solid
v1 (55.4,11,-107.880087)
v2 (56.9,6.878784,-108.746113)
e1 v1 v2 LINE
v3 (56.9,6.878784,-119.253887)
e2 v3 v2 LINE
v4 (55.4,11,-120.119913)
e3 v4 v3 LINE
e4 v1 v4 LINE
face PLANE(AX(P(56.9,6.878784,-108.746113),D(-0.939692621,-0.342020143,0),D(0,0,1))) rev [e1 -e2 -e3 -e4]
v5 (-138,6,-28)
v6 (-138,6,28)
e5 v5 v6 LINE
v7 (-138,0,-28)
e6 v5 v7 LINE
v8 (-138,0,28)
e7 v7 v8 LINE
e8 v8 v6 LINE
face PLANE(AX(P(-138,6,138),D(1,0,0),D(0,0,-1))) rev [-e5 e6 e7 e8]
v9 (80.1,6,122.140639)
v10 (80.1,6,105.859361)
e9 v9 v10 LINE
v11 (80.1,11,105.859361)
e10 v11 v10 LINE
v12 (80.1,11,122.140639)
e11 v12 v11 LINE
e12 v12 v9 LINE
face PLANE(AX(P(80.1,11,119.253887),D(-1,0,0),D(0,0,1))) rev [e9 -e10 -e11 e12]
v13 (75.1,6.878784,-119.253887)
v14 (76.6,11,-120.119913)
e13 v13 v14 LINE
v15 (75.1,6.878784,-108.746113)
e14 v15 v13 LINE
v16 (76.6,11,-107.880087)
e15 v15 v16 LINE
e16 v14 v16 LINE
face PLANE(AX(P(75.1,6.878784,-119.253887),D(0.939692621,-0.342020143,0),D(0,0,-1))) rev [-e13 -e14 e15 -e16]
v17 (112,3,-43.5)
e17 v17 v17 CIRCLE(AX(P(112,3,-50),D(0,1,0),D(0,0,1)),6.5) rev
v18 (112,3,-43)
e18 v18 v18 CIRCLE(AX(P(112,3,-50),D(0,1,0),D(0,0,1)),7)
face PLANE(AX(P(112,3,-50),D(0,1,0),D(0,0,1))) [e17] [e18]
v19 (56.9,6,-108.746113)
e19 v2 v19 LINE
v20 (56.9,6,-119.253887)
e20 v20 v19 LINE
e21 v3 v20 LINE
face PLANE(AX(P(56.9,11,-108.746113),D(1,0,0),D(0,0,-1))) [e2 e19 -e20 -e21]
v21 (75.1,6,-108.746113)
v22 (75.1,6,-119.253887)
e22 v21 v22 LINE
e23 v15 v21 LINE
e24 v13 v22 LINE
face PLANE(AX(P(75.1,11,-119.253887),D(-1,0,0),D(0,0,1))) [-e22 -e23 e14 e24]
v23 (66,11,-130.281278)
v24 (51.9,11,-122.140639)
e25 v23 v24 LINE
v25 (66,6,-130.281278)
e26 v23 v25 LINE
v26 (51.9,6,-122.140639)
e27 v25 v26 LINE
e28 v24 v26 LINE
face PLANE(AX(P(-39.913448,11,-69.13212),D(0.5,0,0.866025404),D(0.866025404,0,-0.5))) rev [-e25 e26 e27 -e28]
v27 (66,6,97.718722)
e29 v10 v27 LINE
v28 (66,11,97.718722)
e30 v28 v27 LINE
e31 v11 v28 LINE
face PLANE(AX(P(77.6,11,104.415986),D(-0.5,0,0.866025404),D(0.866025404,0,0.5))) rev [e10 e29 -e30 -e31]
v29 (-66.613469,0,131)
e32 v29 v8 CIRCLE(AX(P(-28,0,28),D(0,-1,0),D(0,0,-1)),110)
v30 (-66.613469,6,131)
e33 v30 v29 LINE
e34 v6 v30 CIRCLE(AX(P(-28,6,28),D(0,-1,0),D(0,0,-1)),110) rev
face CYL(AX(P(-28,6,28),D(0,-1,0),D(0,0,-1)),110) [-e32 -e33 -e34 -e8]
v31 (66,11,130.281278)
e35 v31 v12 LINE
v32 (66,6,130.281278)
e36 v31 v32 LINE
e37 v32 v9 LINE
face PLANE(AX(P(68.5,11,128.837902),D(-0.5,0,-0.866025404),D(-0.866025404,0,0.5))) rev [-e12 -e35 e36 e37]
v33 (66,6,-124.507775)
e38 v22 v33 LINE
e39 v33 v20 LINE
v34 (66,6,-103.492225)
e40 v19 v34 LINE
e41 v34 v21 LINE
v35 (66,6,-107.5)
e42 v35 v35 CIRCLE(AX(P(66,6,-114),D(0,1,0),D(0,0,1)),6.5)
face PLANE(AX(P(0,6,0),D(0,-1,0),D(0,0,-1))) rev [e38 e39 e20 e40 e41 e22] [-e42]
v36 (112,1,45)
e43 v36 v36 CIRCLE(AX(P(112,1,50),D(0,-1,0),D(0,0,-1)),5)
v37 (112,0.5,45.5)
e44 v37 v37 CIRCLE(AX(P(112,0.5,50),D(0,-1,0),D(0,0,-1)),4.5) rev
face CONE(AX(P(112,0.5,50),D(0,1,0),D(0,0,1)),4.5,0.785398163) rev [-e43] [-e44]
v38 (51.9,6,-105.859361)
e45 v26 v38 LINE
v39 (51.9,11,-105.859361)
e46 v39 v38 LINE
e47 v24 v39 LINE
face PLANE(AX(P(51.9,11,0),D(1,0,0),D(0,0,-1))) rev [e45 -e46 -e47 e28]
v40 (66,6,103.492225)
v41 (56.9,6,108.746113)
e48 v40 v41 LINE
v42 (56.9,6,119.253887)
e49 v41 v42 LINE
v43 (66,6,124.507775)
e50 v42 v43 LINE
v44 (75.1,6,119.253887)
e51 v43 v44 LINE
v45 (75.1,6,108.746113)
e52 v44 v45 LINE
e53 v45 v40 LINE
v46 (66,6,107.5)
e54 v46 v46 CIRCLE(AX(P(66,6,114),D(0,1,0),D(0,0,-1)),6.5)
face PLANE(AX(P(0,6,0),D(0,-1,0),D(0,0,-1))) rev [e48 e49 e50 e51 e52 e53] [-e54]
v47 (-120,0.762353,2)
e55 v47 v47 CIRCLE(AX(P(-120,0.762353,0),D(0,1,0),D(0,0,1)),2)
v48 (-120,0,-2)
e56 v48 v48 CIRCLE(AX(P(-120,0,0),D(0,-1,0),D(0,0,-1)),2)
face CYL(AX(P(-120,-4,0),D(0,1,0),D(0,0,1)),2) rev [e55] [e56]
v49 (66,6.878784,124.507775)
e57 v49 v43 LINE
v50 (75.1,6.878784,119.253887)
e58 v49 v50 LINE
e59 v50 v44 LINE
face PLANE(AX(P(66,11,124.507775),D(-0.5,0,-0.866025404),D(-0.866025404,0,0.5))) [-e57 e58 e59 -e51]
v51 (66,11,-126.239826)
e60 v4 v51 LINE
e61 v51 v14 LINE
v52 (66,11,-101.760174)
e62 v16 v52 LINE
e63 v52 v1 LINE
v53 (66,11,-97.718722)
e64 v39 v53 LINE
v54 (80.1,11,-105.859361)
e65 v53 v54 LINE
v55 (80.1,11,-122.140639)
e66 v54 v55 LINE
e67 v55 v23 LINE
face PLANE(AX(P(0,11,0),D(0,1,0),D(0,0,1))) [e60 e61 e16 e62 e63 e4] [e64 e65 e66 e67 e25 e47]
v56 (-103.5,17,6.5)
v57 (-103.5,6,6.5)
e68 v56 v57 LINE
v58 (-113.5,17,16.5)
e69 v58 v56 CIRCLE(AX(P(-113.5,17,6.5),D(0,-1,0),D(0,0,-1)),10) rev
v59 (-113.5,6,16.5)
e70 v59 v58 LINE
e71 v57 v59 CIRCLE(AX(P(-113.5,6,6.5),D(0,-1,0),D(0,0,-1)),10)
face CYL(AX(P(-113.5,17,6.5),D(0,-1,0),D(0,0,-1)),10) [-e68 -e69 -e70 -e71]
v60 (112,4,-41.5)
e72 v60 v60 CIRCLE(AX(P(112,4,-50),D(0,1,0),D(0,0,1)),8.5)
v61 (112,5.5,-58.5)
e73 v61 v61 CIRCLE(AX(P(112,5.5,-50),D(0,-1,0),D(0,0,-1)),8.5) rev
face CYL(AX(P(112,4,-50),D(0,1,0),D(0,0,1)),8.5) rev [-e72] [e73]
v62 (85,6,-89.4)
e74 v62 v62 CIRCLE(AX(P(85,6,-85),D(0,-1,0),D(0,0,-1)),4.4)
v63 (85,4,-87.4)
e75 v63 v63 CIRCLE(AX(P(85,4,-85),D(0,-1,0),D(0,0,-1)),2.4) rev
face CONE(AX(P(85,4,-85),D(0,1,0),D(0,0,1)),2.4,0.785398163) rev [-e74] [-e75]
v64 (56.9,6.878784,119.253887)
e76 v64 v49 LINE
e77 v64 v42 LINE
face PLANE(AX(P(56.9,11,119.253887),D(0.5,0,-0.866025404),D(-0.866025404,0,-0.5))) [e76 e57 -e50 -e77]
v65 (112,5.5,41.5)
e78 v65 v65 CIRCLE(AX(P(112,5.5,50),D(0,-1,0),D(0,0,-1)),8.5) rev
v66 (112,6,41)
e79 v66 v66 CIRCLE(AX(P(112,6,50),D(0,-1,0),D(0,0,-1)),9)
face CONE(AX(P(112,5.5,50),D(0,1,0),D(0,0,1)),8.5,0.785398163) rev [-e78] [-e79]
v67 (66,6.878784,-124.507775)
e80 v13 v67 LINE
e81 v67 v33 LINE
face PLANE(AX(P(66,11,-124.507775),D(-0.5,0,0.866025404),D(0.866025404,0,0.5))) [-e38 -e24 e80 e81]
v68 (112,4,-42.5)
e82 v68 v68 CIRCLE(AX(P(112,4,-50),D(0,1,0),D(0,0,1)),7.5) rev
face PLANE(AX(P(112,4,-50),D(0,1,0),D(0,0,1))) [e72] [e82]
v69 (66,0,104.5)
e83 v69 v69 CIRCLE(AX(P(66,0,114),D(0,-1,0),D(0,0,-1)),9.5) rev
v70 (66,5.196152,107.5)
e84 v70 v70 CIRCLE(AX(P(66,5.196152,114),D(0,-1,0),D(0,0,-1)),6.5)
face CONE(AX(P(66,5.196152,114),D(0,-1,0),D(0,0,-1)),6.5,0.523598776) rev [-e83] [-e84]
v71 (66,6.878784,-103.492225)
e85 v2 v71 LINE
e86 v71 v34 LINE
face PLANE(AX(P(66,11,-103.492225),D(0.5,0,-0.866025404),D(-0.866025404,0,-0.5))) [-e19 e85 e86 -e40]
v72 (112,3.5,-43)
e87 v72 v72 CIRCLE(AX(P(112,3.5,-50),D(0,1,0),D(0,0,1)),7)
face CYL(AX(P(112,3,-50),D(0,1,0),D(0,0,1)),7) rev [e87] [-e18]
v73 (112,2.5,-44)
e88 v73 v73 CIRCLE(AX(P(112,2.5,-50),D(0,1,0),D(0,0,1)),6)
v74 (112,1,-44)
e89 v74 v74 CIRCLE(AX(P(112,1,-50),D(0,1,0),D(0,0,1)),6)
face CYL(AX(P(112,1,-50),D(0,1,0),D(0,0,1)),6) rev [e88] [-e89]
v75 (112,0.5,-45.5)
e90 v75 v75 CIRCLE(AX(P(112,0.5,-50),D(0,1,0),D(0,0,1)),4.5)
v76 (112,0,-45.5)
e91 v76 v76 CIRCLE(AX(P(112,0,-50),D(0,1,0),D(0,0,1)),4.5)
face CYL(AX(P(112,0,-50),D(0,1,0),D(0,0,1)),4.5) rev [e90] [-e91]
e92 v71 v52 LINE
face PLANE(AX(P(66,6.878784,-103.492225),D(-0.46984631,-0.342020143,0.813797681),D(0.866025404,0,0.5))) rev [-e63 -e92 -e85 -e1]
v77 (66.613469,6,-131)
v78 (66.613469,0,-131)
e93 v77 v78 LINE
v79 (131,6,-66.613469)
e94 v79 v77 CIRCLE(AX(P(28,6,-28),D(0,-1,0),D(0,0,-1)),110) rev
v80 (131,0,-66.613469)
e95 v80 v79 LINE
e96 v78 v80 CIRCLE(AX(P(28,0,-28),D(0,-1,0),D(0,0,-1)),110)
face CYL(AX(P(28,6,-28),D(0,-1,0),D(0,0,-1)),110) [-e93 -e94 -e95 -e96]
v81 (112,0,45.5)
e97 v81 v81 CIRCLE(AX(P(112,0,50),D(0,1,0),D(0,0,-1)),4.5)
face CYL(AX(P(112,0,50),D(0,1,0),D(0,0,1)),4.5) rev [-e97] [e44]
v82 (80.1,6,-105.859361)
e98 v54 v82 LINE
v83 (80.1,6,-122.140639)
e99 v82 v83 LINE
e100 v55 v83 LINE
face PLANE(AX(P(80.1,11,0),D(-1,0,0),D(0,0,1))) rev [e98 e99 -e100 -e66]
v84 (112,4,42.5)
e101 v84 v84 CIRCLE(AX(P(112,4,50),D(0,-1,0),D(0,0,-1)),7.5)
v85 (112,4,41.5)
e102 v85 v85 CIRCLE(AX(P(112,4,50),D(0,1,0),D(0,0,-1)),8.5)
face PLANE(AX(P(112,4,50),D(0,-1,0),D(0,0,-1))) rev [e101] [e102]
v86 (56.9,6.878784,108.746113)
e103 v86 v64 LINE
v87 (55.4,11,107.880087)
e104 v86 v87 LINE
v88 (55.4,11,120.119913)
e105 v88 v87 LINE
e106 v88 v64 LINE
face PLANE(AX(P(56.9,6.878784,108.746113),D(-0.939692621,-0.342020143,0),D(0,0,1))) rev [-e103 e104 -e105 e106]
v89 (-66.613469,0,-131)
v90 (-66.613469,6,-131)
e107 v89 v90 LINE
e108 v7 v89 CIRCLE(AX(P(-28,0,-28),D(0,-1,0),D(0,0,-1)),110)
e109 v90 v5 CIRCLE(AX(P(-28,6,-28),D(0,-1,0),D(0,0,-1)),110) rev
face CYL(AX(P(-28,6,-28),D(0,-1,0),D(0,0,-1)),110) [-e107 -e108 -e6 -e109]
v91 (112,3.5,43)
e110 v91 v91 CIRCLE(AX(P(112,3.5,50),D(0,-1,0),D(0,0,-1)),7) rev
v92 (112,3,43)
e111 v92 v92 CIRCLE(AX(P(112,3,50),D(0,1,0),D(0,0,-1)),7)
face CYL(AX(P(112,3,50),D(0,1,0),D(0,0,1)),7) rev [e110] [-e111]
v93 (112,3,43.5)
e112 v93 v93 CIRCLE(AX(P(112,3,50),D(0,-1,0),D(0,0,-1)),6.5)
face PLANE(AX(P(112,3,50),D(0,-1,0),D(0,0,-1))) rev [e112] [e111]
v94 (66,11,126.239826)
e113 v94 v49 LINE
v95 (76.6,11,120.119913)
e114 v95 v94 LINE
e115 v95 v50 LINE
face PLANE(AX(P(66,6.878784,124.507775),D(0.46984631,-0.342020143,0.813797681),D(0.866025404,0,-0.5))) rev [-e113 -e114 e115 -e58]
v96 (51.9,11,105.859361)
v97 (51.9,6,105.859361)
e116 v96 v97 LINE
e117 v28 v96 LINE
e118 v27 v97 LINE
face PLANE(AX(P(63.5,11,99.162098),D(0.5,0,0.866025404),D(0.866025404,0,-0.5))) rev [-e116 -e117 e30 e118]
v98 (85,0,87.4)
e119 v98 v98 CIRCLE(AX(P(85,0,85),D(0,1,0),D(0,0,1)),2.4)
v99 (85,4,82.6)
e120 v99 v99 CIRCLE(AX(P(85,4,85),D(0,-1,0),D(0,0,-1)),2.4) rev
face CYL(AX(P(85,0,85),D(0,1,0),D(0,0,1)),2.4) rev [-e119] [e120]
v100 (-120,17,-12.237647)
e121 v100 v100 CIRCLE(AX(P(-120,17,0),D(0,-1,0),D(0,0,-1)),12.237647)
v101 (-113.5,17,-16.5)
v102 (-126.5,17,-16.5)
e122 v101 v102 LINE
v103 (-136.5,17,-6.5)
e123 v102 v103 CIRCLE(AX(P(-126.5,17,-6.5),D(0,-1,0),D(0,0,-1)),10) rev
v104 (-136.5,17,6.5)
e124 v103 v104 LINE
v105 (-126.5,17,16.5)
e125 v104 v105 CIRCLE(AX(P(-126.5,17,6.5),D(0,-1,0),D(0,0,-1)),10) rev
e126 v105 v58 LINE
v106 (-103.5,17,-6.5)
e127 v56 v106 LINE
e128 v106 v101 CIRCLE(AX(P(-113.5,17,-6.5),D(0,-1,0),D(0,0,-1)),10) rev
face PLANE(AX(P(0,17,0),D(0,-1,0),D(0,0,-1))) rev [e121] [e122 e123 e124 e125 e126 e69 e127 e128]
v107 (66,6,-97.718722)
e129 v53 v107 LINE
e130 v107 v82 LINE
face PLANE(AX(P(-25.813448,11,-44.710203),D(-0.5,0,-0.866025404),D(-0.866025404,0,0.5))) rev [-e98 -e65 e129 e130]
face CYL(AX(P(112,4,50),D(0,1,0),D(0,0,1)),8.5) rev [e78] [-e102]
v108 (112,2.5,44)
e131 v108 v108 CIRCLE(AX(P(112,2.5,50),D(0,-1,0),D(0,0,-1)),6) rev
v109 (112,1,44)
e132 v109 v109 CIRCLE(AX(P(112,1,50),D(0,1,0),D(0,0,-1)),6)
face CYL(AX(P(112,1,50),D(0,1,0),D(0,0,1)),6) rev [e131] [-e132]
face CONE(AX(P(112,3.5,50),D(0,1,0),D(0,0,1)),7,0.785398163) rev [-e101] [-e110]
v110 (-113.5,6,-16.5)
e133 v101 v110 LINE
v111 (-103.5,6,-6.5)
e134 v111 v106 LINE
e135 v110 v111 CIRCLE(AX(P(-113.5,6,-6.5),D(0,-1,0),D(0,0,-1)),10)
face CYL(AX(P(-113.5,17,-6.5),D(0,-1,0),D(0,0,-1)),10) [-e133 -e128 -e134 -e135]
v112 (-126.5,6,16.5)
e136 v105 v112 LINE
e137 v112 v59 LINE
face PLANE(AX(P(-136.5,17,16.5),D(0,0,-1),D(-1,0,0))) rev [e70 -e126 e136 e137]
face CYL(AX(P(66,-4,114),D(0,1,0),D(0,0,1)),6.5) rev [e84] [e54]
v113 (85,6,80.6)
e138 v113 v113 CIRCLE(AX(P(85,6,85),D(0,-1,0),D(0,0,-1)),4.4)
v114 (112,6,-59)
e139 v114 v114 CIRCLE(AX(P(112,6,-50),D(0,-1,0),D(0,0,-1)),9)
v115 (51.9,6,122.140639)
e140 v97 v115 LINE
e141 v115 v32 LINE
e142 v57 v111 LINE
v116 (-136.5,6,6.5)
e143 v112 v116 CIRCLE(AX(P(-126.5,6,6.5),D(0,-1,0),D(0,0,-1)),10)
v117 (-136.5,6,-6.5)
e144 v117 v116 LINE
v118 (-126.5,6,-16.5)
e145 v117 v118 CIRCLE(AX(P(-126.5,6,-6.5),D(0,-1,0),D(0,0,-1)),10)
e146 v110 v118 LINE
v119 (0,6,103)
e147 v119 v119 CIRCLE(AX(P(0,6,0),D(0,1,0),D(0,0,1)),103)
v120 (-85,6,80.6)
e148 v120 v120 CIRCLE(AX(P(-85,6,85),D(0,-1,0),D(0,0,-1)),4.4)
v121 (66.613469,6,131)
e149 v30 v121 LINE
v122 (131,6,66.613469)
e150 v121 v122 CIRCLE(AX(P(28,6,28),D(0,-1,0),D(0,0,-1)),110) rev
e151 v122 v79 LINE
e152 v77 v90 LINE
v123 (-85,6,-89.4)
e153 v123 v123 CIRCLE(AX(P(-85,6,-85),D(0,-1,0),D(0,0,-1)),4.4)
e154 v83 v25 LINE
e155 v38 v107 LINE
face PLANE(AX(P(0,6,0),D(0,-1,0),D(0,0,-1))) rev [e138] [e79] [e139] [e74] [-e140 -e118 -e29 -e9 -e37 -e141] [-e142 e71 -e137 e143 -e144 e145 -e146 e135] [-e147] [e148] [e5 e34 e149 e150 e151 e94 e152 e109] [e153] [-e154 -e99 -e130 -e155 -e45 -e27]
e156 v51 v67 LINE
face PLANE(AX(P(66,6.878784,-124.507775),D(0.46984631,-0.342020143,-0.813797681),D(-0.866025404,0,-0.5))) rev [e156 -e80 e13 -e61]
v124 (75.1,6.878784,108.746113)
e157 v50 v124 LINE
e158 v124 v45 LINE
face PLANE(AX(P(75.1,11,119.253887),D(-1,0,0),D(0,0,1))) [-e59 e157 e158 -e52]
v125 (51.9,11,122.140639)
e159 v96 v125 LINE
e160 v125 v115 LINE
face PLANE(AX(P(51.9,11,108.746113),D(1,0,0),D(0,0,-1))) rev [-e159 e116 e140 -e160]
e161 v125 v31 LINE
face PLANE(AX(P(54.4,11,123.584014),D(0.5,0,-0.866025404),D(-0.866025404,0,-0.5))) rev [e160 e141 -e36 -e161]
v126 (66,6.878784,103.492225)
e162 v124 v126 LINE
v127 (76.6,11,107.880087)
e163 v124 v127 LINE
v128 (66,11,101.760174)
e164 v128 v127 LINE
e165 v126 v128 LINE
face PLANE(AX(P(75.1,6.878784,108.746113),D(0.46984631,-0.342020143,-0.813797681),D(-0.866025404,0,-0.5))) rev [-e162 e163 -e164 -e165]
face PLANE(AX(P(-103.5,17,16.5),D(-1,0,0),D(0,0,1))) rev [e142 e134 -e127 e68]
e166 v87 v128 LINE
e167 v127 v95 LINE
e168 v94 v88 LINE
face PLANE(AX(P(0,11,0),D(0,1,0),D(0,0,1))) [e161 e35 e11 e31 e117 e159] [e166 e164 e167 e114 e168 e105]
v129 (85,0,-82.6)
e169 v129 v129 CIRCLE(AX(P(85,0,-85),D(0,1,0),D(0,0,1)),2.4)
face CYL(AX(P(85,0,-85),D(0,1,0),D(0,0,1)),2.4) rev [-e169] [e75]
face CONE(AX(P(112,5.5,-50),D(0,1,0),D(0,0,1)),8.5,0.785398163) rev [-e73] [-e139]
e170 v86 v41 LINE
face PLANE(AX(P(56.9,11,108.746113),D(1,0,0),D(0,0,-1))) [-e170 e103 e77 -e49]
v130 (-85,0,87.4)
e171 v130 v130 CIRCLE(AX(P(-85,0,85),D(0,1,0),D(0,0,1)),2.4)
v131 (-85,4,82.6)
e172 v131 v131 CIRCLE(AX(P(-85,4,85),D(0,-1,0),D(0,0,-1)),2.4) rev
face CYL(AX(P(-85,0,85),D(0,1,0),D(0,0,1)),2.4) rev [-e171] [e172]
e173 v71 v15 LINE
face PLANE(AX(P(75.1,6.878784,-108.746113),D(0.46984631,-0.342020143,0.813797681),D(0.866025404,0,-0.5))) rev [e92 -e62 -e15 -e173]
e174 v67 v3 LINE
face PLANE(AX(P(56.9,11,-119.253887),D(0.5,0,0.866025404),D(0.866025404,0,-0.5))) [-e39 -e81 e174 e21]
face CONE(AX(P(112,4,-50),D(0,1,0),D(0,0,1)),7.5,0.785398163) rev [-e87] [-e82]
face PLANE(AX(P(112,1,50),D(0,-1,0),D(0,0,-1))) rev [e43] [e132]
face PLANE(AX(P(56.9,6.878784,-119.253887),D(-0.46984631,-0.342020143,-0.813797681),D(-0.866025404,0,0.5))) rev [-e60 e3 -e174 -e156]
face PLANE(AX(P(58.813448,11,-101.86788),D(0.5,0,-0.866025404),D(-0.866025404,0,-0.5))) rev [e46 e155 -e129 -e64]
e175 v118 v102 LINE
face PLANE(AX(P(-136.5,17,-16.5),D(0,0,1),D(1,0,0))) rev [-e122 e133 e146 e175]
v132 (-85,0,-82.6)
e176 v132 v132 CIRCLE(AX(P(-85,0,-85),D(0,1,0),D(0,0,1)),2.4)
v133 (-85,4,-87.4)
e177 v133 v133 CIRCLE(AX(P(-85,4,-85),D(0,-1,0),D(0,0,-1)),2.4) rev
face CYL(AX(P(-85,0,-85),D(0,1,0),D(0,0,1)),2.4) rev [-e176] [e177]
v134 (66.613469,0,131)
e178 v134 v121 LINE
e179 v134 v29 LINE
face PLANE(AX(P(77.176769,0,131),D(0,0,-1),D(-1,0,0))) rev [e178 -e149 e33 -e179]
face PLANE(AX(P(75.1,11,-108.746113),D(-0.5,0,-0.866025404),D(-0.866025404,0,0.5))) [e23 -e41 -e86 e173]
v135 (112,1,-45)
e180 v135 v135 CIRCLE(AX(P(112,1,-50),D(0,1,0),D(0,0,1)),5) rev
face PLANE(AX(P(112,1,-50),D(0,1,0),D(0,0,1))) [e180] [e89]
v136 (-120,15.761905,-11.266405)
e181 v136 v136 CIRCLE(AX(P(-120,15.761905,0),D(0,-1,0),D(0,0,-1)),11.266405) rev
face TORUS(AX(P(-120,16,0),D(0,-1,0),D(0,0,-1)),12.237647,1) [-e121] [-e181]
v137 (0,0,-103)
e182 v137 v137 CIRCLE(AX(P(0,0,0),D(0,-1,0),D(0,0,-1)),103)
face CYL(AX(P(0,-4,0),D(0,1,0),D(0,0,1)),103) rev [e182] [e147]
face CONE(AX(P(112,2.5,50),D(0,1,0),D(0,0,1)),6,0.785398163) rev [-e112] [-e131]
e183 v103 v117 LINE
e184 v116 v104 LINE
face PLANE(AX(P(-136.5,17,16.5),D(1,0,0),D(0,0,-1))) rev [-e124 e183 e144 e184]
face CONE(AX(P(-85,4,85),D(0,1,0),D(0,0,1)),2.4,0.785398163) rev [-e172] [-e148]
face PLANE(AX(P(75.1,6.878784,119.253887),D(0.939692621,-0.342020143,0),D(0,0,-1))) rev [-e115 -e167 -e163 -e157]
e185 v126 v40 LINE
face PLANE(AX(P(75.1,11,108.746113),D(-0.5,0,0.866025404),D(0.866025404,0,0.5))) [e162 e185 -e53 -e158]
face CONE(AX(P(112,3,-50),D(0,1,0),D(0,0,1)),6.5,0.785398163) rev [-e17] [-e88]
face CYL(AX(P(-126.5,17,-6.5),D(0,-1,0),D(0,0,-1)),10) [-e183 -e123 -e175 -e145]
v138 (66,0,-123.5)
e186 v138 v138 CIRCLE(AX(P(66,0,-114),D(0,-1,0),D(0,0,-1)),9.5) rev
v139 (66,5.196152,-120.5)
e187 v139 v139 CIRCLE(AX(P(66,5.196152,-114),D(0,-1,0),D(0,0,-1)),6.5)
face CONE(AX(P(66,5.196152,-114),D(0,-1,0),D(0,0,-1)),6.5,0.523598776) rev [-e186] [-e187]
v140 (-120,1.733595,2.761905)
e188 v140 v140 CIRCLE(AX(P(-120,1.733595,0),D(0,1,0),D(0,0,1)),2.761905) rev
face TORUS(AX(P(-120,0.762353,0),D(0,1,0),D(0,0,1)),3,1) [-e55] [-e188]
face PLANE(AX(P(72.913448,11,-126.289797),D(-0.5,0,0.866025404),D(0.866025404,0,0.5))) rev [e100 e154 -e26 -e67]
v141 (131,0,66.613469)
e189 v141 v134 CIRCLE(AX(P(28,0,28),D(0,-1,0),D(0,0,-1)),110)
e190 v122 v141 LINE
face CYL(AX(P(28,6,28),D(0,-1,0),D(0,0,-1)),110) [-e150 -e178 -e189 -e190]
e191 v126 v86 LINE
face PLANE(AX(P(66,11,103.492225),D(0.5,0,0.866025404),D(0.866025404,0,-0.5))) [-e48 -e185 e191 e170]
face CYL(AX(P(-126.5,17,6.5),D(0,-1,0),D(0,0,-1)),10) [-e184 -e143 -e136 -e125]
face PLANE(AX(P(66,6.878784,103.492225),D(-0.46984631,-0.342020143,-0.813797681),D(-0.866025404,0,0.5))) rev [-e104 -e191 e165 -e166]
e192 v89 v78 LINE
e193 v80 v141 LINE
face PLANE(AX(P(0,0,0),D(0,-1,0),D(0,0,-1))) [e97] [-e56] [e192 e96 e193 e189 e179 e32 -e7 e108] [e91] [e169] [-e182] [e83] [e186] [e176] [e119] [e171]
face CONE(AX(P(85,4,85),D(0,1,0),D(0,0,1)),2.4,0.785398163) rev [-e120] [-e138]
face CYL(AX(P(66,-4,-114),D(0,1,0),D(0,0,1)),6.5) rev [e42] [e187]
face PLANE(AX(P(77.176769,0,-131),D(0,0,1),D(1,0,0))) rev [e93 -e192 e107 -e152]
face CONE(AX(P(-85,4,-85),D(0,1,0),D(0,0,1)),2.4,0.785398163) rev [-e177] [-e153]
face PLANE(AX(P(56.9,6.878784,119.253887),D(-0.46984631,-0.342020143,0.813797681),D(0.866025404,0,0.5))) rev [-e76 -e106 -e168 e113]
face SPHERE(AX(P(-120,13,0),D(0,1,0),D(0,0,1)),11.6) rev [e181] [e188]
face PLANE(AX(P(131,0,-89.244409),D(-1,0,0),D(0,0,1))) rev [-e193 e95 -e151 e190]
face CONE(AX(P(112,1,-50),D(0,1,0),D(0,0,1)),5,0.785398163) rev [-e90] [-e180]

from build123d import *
from OCP.BRepFilletAPI import BRepFilletAPI_MakeChamfer

# Parameters (mm, degrees)
SKETCH_1_W           = 276
SKETCH_1_H           = 276
EXTRUDE_1_DEPTH      = 6
SKETCH_4_R           = 6.5
SKETCH_4_R_2         = 2
CUT_EXTRUDE_1_DEPTH  = 10
SKETCH_5_R           = 2.4
CUT_EXTRUDE_2_DEPTH  = 196.253681143
FILLET_1_R           = 110
EXTRUDE_1_2_DEPTH    = 5
CHAMFER_2_SIZE       = 1.5
CHAMFER_2_SIZE2      = 4.121216129
SKETCH_9_W           = 33
SKETCH_9_H           = 33
EXTRUDE_2_DEPTH      = 11
FILLET_2_R           = 1
FILLET_3_R           = 10
CHAMFER_5_SIZE       = 3
CHAMFER_5_SIZE2      = 5.196152423
SKETCH_6_R           = 103
CUT_EXTRUDE_3_DEPTH  = 10
CHAMFER_6_SIZE       = 2
SKETCH_13_R          = 4.5
CUT_EXTRUDE_6_DEPTH  = 196.47122551
SKETCH_14_R          = 6
CUT_EXTRUDE_7_DEPTH  = 5
SKETCH_15_R          = 7
CUT_EXTRUDE_8_DEPTH  = 3
SKETCH_16_R          = 8.5
CUT_EXTRUDE_9_DEPTH  = 2
CHAMFER_7_SIZE       = 0.5
SKETCH_18_W          = 167.450202049
SKETCH_18_H          = 12.846548741
SKETCH_18_W_2        = 47.896370642
SKETCH_18_H_2        = 198.133814491
CUT_EXTRUDE_10_DEPTH = 196.900484949


# Read off the part's stored shape, not the designer's step: Вытянуть-Тонкостенный1
with BuildPart() as part:
    # Эскиз1 → Extrude 1 (new body)
    with BuildSketch(Plane(origin=(0, 0, 0), x_dir=(1, 0, 0), z_dir=(0, 1, 0))):
        Rectangle(SKETCH_1_W, SKETCH_1_H)
    extrude(amount=EXTRUDE_1_DEPTH)

    # Эскиз4 → Cut-Extrude 1 (cut)
    with BuildSketch(Plane(origin=(0, 6, 0), x_dir=(1, 0, 0), z_dir=(0, 1, 0))):
        with Locations(Location((66, 114, 0), (0, 0, 270))):
            Circle(SKETCH_4_R)
        with Locations(Location((-120, 0, 0), (0, 0, 270))):
            Circle(SKETCH_4_R_2)
        with Locations(Location((66, -114, 0), (0, 0, 90))):
            Circle(SKETCH_4_R)
    extrude(amount=-CUT_EXTRUDE_1_DEPTH, mode=Mode.SUBTRACT)

    # Эскиз5 → Вырез-Вытянуть2 (cut, through all)
    with BuildSketch(Plane(origin=(0, 6, 0), x_dir=(1, 0, 0), z_dir=(0, 1, 0))):
        with Locations(Location((-85, 85, 0), (0, 0, 270))):
            Circle(SKETCH_5_R)
        with Locations(Location((85, 85, 0), (0, 0, 270))):
            Circle(SKETCH_5_R)
        with Locations(Location((85, -85, 0), (0, 0, 270))):
            Circle(SKETCH_5_R)
        with Locations(Location((-85, -85, 0), (0, 0, 270))):
            Circle(SKETCH_5_R)
        with Locations(Location((-90, 0, 0), (0, 0, 270))):
            Circle(SKETCH_5_R)
        with Locations(Location((0, 90, 0), (0, 0, 270))):
            Circle(SKETCH_5_R)
        with Locations(Location((0, -90, 0), (0, 0, 90))):
            Circle(SKETCH_5_R)
        with Locations(Location((90, 0, 0), (0, 0, 90))):
            Circle(SKETCH_5_R)
    extrude(amount=-CUT_EXTRUDE_2_DEPTH, mode=Mode.SUBTRACT)

    # Скругление1
    fillet_1_edges = [part.edges().sort_by_distance(p)[0] for p in [
        (138, 3, 138),
        (-138, 3, 138),
        (-138, 3, -138),
        (138, 3, -138),
    ]]
    fillet(fillet_1_edges, radius=FILLET_1_R)

    # Extrude 1 2 outline → Extrude 1 2 (add)
    # profile 1 of 2: a face of its own
    with BuildSketch(Plane(origin=(0, 6, 0), x_dir=(1, 0, 0), z_dir=(0, 1, 0))):
        Polygon((80.1, -105.859361204), (66, -97.718722409), (51.9, -105.859361204), (51.9, -122.140638796), (66, -130.281277591), (80.1, -122.140638796), align=None)
        Polygon((56.9, -108.74611255), (66, -103.492225101), (75.1, -108.74611255), (75.1, -119.25388745), (66, -124.507774899), (56.9, -119.25388745), align=None, mode=Mode.SUBTRACT)
    # profile 2 of 2: a face of its own
    with BuildSketch(Plane(origin=(0, 6, 0), x_dir=(1, 0, 0), z_dir=(0, 1, 0))):
        Polygon((51.9, 122.140638796), (51.9, 105.859361204), (66, 97.718722409), (80.1, 105.859361204), (80.1, 122.140638796), (66, 130.281277591), align=None)
        Polygon((66, 103.492225101), (56.9, 108.74611255), (56.9, 119.25388745), (66, 124.507774899), (75.1, 119.25388745), (75.1, 108.74611255), align=None, mode=Mode.SUBTRACT)
    extrude(amount=EXTRUDE_1_2_DEPTH)

    # Фаска2: one chamfer whose edges measure the first distance from different faces: ONE call of the kernel's chamfer builder (chamfer() names one face for all edges)
    chamfer_2_edges_1 = [part.edges().sort_by_distance(p)[0] for p in [
        (70.55, 11, 106.119168825),
        (61.45, 11, 106.119168825),
        (56.9, 11, 114),
        (61.45, 11, 121.880831175),
        (70.55, 11, 121.880831175),
        (75.1, 11, 114),
    ]]
    chamfer_2_side_1 = [part.faces().sort_by_distance(p)[0] for p in [
        (72.834618942, 11, 102.162092741),
    ]]
    chamfer_2_edges_2 = [part.edges().sort_by_distance(p)[0] for p in [
        (75.1, 11, -114),
        (70.55, 11, -121.880831175),
        (61.45, 11, -121.880831175),
        (56.9, 11, -114),
        (61.45, 11, -106.119168825),
        (70.55, 11, -106.119168825),
    ]]
    chamfer_2_side_2 = [part.faces().sort_by_distance(p)[0] for p in [
        (52.330762115, 11, -114),
    ]]
    chamfer_2 = BRepFilletAPI_MakeChamfer(part.part.solid().wrapped)
    for e in chamfer_2_edges_1:
        chamfer_2.Add(CHAMFER_2_SIZE, CHAMFER_2_SIZE2, e.wrapped, chamfer_2_side_1[0].wrapped)  # the first distance lies on this face
    for e in chamfer_2_edges_2:
        chamfer_2.Add(CHAMFER_2_SIZE, CHAMFER_2_SIZE2, e.wrapped, chamfer_2_side_2[0].wrapped)  # the first distance lies on this face
    add(Compound.cast(chamfer_2.Shape()), mode=Mode.REPLACE)

    # Эскиз9 → Бобышка-Вытянуть2 (add)
    with BuildSketch(Plane(origin=(0, 6, 0), x_dir=(1, 0, 0), z_dir=(0, 1, 0))):
        with Locations((-120, 0)):
            Rectangle(SKETCH_9_W, SKETCH_9_H)
    extrude(amount=EXTRUDE_2_DEPTH)

    # Эскиз10 → Вырез-Повернуть1 (revolve, cut)
    with BuildSketch(Plane(origin=(0, 13, 0), x_dir=(1, 0, 0), z_dir=(0, 1, 0))):
        with BuildLine():
            Line((-131.6, 0), (-108.4, 0))
            ThreePointArc((-108.4, 0), (-120, 11.6), (-131.6, 0))
        make_face()
    revolve(axis=Axis((-131.6, 13, 0), (1, 0, 0)), mode=Mode.SUBTRACT)

    # Скругление2
    fillet_2_edges = [part.edges().sort_by_distance(p)[0] for p in [
        (-119.999999999, 1.573714514, -1.999999986),
        (-120, 17, -10.888526071),
    ]]
    fillet(fillet_2_edges, radius=FILLET_2_R)

    # Скругление3
    fillet_3_edges = [part.edges().sort_by_distance(p)[0] for p in [
        (-103.5, 11.5, 16.5),
        (-103.5, 11.5, -16.5),
        (-136.5, 11.5, -16.5),
        (-136.5, 11.5, 16.5),
    ]]
    fillet(fillet_3_edges, radius=FILLET_3_R)

    # Фаска5
    chamfer_5_edges = [part.edges().sort_by_distance(p)[0] for p in [
        (66, 0, 120.5),
        (66, 0, -120.5),
    ]]
    chamfer_5_side = [part.faces().sort_by_distance(p)[0] for p in [
        (-0.244968045, 0, 0),
    ]]
    chamfer(chamfer_5_edges, length=CHAMFER_5_SIZE, length2=CHAMFER_5_SIZE2, reference=chamfer_5_side[0])

    # Эскиз6 → Вырез-Вытянуть3 (cut)
    with BuildSketch(Plane(origin=(0, 6, 0), x_dir=(1, 0, 0), z_dir=(0, 1, 0))):
        with Locations(Location((0, 0, 0), (0, 0, 270))):
            Circle(SKETCH_6_R)
    extrude(amount=-CUT_EXTRUDE_3_DEPTH, mode=Mode.SUBTRACT)

    # Фаска6
    chamfer_6_edges = [part.edges().sort_by_distance(p)[0] for p in [
        (85, 6, -87.4),
        (85, 6, 82.6),
        (-85, 6, 82.6),
        (-85, 6, -87.4),
    ]]
    chamfer(chamfer_6_edges, length=CHAMFER_6_SIZE)

    # Эскиз13 → Вырез-Вытянуть6 (cut, through all)
    with BuildSketch(Plane(origin=(0, 6, 0), x_dir=(1, 0, 0), z_dir=(0, 1, 0))):
        with Locations(Location((112, 50, 0), (0, 0, 270))):
            Circle(SKETCH_13_R)
        with Locations(Location((112, -50, 0), (0, 0, 90))):
            Circle(SKETCH_13_R)
    extrude(amount=-CUT_EXTRUDE_6_DEPTH, mode=Mode.SUBTRACT)

    # Эскиз14 → Вырез-Вытянуть7 (cut)
    with BuildSketch(Plane(origin=(0, 6, 0), x_dir=(1, 0, 0), z_dir=(0, 1, 0))):
        with Locations(Location((112, 50, 0), (0, 0, 270))):
            Circle(SKETCH_14_R)
        with Locations(Location((112, -50, 0), (0, 0, 90))):
            Circle(SKETCH_14_R)
    extrude(amount=-CUT_EXTRUDE_7_DEPTH, mode=Mode.SUBTRACT)

    # Эскиз15 → Вырез-Вытянуть8 (cut)
    with BuildSketch(Plane(origin=(0, 6, 0), x_dir=(1, 0, 0), z_dir=(0, 1, 0))):
        with Locations(Location((112, 50, 0), (0, 0, 270))):
            Circle(SKETCH_15_R)
        with Locations(Location((112, -50, 0), (0, 0, 90))):
            Circle(SKETCH_15_R)
    extrude(amount=-CUT_EXTRUDE_8_DEPTH, mode=Mode.SUBTRACT)

    # Эскиз16 → Вырез-Вытянуть9 (cut)
    with BuildSketch(Plane(origin=(0, 6, 0), x_dir=(1, 0, 0), z_dir=(0, 1, 0))):
        with Locations(Location((112, 50, 0), (0, 0, 270))):
            Circle(SKETCH_16_R)
        with Locations(Location((112, -50, 0), (0, 0, 90))):
            Circle(SKETCH_16_R)
    extrude(amount=-CUT_EXTRUDE_9_DEPTH, mode=Mode.SUBTRACT)

    # Фаска7
    chamfer_7_edges = [part.edges().sort_by_distance(p)[0] for p in [
        (112, 1, -54.5),
        (112, 1, 54.5),
        (112, 3, -56),
        (112, 3, 56),
        (112, 6, -58.5),
        (112, 4, -57),
        (112, 4, 57),
        (112, 6, 58.5),
    ]]
    chamfer(chamfer_7_edges, length=CHAMFER_7_SIZE)

    # Эскиз18 → Вырез-Вытянуть10 (cut, through all)
    with BuildSketch(Plane(origin=(0, 17, 0), x_dir=(1, 0, 0), z_dir=(0, 1, 0))):
        with Locations((-6.548331924, 137.42327437)):
            Rectangle(SKETCH_18_W, SKETCH_18_H)
        with Locations((-6.548331924, -137.42327437)):
            Rectangle(SKETCH_18_W, SKETCH_18_H)
        with Locations((154.948185321, -9.822497885)):
            Rectangle(SKETCH_18_W_2, SKETCH_18_H_2)
    extrude(amount=-CUT_EXTRUDE_10_DEPTH, mode=Mode.SUBTRACT)


solid = part.part
